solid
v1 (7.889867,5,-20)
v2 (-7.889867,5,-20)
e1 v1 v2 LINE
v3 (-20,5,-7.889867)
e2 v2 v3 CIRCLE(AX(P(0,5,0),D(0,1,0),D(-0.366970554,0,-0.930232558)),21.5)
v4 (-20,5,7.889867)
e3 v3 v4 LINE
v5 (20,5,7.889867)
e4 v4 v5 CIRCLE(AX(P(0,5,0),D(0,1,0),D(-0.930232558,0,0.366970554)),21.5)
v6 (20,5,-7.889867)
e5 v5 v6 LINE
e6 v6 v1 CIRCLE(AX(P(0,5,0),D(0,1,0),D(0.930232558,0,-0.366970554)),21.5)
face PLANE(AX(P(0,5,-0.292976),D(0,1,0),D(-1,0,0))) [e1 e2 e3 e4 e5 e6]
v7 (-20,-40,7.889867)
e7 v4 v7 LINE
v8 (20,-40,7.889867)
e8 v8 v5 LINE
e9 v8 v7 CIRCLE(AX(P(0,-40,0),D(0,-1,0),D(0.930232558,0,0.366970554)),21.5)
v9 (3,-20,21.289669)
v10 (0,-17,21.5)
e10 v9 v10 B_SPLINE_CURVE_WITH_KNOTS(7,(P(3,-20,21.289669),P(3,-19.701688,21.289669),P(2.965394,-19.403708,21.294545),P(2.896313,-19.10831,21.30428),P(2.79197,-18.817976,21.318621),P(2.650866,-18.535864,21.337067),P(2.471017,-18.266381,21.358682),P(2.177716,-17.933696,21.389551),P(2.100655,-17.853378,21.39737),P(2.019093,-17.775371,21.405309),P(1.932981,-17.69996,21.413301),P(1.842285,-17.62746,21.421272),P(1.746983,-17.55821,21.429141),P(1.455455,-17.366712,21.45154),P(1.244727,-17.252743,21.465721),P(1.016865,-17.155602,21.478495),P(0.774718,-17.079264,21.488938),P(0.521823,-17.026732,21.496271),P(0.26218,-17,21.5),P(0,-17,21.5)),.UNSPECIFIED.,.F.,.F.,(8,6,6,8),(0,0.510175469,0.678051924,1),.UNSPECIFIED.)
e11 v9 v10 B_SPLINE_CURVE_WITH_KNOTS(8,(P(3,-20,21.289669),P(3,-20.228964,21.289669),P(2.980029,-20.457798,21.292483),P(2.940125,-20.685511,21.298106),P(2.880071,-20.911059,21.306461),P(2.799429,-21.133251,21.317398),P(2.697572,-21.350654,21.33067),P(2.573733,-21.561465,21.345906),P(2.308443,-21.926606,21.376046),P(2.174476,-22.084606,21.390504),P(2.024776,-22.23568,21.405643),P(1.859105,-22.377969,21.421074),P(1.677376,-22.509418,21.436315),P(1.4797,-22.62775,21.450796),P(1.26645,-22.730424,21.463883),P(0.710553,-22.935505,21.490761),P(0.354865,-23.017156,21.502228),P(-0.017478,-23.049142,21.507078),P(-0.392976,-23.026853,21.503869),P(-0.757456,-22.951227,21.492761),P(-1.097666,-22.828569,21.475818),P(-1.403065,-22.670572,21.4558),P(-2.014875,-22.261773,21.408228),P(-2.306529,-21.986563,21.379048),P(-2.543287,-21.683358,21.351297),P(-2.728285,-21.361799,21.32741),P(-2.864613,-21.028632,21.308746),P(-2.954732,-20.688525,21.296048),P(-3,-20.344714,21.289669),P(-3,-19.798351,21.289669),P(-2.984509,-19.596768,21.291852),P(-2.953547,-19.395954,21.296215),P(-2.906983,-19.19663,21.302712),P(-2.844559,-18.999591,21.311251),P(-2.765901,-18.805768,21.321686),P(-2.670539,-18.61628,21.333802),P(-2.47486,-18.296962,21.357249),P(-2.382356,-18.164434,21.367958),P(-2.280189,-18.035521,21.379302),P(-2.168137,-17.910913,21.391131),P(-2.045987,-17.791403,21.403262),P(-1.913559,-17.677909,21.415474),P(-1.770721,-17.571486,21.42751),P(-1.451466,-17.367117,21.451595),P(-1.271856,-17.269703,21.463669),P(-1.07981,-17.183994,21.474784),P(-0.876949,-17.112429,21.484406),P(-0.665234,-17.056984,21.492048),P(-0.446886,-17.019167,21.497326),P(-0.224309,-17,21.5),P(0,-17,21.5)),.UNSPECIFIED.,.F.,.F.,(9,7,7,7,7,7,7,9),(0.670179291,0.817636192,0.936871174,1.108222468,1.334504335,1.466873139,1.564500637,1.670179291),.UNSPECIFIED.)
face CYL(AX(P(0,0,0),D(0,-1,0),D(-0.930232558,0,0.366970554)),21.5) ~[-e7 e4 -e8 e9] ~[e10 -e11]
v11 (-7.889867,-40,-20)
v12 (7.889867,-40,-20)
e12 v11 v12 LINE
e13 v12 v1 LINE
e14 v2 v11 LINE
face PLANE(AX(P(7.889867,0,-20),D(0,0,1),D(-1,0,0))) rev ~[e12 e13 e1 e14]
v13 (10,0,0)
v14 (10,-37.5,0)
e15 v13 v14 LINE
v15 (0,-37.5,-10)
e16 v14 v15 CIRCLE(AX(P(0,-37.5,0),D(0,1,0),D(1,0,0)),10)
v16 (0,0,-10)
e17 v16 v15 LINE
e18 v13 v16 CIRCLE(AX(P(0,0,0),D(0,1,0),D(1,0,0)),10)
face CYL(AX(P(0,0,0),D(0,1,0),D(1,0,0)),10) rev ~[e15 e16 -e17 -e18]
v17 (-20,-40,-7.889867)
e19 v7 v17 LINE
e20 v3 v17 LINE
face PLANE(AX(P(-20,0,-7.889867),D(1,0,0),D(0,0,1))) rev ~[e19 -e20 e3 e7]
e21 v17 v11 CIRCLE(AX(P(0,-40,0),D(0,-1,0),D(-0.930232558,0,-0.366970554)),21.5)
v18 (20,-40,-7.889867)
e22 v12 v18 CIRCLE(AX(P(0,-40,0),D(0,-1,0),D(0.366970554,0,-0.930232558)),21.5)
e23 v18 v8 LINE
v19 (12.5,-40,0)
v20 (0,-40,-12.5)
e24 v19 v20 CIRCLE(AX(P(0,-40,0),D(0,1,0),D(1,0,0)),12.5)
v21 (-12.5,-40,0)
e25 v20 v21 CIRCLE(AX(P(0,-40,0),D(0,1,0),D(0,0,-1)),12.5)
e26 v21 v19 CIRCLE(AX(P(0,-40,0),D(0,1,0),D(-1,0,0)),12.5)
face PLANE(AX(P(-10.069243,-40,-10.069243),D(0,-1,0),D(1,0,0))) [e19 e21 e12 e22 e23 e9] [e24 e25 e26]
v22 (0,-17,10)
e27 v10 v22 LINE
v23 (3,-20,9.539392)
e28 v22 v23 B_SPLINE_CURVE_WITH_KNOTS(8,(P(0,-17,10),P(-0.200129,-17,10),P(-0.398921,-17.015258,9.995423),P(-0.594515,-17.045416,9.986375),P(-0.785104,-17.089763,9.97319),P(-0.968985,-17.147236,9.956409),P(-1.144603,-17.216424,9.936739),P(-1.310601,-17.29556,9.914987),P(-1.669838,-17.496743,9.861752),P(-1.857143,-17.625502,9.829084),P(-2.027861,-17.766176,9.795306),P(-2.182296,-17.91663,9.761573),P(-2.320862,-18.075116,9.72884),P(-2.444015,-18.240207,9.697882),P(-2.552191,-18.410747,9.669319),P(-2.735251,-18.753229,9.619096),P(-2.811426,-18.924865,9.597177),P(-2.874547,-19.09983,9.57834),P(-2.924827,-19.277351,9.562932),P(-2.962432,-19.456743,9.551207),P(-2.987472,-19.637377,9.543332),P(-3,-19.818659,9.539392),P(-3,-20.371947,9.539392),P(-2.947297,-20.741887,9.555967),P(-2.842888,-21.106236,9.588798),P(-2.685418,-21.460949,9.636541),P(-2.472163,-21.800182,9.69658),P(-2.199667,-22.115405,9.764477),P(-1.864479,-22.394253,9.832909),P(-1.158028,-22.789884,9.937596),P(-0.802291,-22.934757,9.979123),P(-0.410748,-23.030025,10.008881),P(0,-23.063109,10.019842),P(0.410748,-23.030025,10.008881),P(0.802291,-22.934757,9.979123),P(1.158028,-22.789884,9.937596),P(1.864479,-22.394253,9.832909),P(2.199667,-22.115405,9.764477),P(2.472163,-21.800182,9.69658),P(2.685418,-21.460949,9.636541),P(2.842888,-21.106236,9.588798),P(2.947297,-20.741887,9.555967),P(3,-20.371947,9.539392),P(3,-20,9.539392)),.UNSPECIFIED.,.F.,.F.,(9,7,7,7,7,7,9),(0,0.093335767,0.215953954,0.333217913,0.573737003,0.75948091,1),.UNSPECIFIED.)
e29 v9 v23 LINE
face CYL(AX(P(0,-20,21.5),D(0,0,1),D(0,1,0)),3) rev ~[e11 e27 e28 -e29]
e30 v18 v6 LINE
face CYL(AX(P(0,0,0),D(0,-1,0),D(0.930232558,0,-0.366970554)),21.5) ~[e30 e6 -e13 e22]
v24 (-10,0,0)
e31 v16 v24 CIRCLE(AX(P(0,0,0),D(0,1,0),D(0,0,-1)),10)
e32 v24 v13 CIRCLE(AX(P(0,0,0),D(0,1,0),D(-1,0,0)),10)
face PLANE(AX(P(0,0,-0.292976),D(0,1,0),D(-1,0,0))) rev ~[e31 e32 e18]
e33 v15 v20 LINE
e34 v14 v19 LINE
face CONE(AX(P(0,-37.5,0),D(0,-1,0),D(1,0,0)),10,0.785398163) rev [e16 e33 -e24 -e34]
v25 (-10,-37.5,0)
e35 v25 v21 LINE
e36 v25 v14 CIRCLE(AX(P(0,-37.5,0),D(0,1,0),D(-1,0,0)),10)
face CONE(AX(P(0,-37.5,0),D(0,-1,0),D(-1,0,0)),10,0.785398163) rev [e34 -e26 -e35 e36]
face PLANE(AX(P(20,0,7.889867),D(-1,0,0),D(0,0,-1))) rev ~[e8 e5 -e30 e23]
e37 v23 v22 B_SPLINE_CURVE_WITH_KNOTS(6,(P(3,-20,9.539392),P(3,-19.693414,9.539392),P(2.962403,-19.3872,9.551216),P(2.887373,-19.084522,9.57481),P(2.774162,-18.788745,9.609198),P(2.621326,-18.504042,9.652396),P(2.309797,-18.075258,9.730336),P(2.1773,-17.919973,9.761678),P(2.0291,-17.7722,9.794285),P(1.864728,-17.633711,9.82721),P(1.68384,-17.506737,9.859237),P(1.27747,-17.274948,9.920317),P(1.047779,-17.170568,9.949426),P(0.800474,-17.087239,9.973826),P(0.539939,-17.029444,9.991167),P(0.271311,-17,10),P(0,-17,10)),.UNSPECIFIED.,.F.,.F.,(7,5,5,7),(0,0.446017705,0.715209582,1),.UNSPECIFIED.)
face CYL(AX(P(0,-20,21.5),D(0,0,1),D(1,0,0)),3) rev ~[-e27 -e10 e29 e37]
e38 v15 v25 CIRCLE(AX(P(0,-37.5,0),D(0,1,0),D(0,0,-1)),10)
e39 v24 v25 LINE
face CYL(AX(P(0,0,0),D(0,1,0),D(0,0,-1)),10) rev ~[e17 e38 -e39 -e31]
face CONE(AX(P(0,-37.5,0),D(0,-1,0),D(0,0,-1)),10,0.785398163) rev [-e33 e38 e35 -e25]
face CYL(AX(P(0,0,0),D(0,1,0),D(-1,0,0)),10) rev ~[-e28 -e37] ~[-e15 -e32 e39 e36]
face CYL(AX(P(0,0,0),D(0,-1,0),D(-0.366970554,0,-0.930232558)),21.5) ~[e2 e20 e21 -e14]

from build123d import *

# Parameters (mm, degrees)
F1_DEPTH = 40
F2_R     = 10
F3_DEPTH = 5
F6_DEPTH = 15
F7_SIZE  = 2.5


with BuildPart() as f1:
    # F0 (on Front) → F1 (new body)
    with BuildSketch(Plane.XZ):
        with BuildLine():
            Line((-20, 0), (-20, -7.889866919))
            ThreePointArc((-20, -7.889866919), (-15.2027957955, -15.2027957955), (-7.889866919, -20))
            Line((-7.889866919, -20), (0, -20))
            Line((0, -20), (0, -10))
            ThreePointArc((0, -10), (-7.0710678119, -7.0710678119), (-10, 0))
            Line((-10, 0), (-20, 0))
        make_face()
        with BuildLine():
            ThreePointArc((7.889866919, -20), (15.2027957955, -15.2027957955), (20, -7.889866919))
            Line((20, -7.889866919), (20, 0))
            Line((20, 0), (10, 0))
            ThreePointArc((10, 0), (7.0710678119, -7.0710678119), (0, -10))
            Line((0, -10), (0, -20))
            Line((0, -20), (7.889866919, -20))
        make_face()
        with BuildLine():
            Line((20, 0), (20, 7.889866919))
            ThreePointArc((20, 7.889866919), (0, 21.5), (-20, 7.889866919))
            Line((-20, 7.889866919), (-20, 0))
            Line((-20, 0), (-10, 0))
            ThreePointArc((-10, 0), (0, 10), (10, 0))
            Line((10, 0), (20, 0))
        make_face()
    extrude(amount=F1_DEPTH)

    # F2 (on face) → F3 (join)
    with BuildSketch(Plane(origin=(0, 0, 0), x_dir=(-1, 0, 0), z_dir=(0, 1, 0))):
        with BuildLine():
            ThreePointArc((20, 7.889866919), (0, 21.5), (-20, 7.889866919))
            Line((-20, 7.889866919), (-20, -7.889866919))
            ThreePointArc((-20, -7.889866919), (-15.2027957955, -15.2027957955), (-7.889866919, -20))
            Line((-7.889866919, -20), (7.889866919, -20))
            ThreePointArc((7.889866919, -20), (15.2027957955, -15.2027957955), (20, -7.889866919))
            Line((20, -7.889866919), (20, 7.889866919))
        make_face()
        Circle(F2_R, mode=Mode.SUBTRACT)
        Circle(F2_R)
    extrude(amount=F3_DEPTH)

    # F5 (on offset) → F6 (cut)
    with BuildSketch(Plane.XY.offset(21.5)):
        with BuildLine():
            ThreePointArc((0, -17), (-2.1213203436, -22.1213203436), (3, -20))
            ThreePointArc((3, -20), (2.1213203436, -17.8786796564), (0, -17))
        make_face()
    extrude(amount=-F6_DEPTH, mode=Mode.SUBTRACT)

    # F7
    f7_edges = [f1.edges().sort_by_distance(p)[0] for p in [
        (10, -40, 0),
    ]]
    chamfer(f7_edges, length=F7_SIZE)


solid = f1.part
